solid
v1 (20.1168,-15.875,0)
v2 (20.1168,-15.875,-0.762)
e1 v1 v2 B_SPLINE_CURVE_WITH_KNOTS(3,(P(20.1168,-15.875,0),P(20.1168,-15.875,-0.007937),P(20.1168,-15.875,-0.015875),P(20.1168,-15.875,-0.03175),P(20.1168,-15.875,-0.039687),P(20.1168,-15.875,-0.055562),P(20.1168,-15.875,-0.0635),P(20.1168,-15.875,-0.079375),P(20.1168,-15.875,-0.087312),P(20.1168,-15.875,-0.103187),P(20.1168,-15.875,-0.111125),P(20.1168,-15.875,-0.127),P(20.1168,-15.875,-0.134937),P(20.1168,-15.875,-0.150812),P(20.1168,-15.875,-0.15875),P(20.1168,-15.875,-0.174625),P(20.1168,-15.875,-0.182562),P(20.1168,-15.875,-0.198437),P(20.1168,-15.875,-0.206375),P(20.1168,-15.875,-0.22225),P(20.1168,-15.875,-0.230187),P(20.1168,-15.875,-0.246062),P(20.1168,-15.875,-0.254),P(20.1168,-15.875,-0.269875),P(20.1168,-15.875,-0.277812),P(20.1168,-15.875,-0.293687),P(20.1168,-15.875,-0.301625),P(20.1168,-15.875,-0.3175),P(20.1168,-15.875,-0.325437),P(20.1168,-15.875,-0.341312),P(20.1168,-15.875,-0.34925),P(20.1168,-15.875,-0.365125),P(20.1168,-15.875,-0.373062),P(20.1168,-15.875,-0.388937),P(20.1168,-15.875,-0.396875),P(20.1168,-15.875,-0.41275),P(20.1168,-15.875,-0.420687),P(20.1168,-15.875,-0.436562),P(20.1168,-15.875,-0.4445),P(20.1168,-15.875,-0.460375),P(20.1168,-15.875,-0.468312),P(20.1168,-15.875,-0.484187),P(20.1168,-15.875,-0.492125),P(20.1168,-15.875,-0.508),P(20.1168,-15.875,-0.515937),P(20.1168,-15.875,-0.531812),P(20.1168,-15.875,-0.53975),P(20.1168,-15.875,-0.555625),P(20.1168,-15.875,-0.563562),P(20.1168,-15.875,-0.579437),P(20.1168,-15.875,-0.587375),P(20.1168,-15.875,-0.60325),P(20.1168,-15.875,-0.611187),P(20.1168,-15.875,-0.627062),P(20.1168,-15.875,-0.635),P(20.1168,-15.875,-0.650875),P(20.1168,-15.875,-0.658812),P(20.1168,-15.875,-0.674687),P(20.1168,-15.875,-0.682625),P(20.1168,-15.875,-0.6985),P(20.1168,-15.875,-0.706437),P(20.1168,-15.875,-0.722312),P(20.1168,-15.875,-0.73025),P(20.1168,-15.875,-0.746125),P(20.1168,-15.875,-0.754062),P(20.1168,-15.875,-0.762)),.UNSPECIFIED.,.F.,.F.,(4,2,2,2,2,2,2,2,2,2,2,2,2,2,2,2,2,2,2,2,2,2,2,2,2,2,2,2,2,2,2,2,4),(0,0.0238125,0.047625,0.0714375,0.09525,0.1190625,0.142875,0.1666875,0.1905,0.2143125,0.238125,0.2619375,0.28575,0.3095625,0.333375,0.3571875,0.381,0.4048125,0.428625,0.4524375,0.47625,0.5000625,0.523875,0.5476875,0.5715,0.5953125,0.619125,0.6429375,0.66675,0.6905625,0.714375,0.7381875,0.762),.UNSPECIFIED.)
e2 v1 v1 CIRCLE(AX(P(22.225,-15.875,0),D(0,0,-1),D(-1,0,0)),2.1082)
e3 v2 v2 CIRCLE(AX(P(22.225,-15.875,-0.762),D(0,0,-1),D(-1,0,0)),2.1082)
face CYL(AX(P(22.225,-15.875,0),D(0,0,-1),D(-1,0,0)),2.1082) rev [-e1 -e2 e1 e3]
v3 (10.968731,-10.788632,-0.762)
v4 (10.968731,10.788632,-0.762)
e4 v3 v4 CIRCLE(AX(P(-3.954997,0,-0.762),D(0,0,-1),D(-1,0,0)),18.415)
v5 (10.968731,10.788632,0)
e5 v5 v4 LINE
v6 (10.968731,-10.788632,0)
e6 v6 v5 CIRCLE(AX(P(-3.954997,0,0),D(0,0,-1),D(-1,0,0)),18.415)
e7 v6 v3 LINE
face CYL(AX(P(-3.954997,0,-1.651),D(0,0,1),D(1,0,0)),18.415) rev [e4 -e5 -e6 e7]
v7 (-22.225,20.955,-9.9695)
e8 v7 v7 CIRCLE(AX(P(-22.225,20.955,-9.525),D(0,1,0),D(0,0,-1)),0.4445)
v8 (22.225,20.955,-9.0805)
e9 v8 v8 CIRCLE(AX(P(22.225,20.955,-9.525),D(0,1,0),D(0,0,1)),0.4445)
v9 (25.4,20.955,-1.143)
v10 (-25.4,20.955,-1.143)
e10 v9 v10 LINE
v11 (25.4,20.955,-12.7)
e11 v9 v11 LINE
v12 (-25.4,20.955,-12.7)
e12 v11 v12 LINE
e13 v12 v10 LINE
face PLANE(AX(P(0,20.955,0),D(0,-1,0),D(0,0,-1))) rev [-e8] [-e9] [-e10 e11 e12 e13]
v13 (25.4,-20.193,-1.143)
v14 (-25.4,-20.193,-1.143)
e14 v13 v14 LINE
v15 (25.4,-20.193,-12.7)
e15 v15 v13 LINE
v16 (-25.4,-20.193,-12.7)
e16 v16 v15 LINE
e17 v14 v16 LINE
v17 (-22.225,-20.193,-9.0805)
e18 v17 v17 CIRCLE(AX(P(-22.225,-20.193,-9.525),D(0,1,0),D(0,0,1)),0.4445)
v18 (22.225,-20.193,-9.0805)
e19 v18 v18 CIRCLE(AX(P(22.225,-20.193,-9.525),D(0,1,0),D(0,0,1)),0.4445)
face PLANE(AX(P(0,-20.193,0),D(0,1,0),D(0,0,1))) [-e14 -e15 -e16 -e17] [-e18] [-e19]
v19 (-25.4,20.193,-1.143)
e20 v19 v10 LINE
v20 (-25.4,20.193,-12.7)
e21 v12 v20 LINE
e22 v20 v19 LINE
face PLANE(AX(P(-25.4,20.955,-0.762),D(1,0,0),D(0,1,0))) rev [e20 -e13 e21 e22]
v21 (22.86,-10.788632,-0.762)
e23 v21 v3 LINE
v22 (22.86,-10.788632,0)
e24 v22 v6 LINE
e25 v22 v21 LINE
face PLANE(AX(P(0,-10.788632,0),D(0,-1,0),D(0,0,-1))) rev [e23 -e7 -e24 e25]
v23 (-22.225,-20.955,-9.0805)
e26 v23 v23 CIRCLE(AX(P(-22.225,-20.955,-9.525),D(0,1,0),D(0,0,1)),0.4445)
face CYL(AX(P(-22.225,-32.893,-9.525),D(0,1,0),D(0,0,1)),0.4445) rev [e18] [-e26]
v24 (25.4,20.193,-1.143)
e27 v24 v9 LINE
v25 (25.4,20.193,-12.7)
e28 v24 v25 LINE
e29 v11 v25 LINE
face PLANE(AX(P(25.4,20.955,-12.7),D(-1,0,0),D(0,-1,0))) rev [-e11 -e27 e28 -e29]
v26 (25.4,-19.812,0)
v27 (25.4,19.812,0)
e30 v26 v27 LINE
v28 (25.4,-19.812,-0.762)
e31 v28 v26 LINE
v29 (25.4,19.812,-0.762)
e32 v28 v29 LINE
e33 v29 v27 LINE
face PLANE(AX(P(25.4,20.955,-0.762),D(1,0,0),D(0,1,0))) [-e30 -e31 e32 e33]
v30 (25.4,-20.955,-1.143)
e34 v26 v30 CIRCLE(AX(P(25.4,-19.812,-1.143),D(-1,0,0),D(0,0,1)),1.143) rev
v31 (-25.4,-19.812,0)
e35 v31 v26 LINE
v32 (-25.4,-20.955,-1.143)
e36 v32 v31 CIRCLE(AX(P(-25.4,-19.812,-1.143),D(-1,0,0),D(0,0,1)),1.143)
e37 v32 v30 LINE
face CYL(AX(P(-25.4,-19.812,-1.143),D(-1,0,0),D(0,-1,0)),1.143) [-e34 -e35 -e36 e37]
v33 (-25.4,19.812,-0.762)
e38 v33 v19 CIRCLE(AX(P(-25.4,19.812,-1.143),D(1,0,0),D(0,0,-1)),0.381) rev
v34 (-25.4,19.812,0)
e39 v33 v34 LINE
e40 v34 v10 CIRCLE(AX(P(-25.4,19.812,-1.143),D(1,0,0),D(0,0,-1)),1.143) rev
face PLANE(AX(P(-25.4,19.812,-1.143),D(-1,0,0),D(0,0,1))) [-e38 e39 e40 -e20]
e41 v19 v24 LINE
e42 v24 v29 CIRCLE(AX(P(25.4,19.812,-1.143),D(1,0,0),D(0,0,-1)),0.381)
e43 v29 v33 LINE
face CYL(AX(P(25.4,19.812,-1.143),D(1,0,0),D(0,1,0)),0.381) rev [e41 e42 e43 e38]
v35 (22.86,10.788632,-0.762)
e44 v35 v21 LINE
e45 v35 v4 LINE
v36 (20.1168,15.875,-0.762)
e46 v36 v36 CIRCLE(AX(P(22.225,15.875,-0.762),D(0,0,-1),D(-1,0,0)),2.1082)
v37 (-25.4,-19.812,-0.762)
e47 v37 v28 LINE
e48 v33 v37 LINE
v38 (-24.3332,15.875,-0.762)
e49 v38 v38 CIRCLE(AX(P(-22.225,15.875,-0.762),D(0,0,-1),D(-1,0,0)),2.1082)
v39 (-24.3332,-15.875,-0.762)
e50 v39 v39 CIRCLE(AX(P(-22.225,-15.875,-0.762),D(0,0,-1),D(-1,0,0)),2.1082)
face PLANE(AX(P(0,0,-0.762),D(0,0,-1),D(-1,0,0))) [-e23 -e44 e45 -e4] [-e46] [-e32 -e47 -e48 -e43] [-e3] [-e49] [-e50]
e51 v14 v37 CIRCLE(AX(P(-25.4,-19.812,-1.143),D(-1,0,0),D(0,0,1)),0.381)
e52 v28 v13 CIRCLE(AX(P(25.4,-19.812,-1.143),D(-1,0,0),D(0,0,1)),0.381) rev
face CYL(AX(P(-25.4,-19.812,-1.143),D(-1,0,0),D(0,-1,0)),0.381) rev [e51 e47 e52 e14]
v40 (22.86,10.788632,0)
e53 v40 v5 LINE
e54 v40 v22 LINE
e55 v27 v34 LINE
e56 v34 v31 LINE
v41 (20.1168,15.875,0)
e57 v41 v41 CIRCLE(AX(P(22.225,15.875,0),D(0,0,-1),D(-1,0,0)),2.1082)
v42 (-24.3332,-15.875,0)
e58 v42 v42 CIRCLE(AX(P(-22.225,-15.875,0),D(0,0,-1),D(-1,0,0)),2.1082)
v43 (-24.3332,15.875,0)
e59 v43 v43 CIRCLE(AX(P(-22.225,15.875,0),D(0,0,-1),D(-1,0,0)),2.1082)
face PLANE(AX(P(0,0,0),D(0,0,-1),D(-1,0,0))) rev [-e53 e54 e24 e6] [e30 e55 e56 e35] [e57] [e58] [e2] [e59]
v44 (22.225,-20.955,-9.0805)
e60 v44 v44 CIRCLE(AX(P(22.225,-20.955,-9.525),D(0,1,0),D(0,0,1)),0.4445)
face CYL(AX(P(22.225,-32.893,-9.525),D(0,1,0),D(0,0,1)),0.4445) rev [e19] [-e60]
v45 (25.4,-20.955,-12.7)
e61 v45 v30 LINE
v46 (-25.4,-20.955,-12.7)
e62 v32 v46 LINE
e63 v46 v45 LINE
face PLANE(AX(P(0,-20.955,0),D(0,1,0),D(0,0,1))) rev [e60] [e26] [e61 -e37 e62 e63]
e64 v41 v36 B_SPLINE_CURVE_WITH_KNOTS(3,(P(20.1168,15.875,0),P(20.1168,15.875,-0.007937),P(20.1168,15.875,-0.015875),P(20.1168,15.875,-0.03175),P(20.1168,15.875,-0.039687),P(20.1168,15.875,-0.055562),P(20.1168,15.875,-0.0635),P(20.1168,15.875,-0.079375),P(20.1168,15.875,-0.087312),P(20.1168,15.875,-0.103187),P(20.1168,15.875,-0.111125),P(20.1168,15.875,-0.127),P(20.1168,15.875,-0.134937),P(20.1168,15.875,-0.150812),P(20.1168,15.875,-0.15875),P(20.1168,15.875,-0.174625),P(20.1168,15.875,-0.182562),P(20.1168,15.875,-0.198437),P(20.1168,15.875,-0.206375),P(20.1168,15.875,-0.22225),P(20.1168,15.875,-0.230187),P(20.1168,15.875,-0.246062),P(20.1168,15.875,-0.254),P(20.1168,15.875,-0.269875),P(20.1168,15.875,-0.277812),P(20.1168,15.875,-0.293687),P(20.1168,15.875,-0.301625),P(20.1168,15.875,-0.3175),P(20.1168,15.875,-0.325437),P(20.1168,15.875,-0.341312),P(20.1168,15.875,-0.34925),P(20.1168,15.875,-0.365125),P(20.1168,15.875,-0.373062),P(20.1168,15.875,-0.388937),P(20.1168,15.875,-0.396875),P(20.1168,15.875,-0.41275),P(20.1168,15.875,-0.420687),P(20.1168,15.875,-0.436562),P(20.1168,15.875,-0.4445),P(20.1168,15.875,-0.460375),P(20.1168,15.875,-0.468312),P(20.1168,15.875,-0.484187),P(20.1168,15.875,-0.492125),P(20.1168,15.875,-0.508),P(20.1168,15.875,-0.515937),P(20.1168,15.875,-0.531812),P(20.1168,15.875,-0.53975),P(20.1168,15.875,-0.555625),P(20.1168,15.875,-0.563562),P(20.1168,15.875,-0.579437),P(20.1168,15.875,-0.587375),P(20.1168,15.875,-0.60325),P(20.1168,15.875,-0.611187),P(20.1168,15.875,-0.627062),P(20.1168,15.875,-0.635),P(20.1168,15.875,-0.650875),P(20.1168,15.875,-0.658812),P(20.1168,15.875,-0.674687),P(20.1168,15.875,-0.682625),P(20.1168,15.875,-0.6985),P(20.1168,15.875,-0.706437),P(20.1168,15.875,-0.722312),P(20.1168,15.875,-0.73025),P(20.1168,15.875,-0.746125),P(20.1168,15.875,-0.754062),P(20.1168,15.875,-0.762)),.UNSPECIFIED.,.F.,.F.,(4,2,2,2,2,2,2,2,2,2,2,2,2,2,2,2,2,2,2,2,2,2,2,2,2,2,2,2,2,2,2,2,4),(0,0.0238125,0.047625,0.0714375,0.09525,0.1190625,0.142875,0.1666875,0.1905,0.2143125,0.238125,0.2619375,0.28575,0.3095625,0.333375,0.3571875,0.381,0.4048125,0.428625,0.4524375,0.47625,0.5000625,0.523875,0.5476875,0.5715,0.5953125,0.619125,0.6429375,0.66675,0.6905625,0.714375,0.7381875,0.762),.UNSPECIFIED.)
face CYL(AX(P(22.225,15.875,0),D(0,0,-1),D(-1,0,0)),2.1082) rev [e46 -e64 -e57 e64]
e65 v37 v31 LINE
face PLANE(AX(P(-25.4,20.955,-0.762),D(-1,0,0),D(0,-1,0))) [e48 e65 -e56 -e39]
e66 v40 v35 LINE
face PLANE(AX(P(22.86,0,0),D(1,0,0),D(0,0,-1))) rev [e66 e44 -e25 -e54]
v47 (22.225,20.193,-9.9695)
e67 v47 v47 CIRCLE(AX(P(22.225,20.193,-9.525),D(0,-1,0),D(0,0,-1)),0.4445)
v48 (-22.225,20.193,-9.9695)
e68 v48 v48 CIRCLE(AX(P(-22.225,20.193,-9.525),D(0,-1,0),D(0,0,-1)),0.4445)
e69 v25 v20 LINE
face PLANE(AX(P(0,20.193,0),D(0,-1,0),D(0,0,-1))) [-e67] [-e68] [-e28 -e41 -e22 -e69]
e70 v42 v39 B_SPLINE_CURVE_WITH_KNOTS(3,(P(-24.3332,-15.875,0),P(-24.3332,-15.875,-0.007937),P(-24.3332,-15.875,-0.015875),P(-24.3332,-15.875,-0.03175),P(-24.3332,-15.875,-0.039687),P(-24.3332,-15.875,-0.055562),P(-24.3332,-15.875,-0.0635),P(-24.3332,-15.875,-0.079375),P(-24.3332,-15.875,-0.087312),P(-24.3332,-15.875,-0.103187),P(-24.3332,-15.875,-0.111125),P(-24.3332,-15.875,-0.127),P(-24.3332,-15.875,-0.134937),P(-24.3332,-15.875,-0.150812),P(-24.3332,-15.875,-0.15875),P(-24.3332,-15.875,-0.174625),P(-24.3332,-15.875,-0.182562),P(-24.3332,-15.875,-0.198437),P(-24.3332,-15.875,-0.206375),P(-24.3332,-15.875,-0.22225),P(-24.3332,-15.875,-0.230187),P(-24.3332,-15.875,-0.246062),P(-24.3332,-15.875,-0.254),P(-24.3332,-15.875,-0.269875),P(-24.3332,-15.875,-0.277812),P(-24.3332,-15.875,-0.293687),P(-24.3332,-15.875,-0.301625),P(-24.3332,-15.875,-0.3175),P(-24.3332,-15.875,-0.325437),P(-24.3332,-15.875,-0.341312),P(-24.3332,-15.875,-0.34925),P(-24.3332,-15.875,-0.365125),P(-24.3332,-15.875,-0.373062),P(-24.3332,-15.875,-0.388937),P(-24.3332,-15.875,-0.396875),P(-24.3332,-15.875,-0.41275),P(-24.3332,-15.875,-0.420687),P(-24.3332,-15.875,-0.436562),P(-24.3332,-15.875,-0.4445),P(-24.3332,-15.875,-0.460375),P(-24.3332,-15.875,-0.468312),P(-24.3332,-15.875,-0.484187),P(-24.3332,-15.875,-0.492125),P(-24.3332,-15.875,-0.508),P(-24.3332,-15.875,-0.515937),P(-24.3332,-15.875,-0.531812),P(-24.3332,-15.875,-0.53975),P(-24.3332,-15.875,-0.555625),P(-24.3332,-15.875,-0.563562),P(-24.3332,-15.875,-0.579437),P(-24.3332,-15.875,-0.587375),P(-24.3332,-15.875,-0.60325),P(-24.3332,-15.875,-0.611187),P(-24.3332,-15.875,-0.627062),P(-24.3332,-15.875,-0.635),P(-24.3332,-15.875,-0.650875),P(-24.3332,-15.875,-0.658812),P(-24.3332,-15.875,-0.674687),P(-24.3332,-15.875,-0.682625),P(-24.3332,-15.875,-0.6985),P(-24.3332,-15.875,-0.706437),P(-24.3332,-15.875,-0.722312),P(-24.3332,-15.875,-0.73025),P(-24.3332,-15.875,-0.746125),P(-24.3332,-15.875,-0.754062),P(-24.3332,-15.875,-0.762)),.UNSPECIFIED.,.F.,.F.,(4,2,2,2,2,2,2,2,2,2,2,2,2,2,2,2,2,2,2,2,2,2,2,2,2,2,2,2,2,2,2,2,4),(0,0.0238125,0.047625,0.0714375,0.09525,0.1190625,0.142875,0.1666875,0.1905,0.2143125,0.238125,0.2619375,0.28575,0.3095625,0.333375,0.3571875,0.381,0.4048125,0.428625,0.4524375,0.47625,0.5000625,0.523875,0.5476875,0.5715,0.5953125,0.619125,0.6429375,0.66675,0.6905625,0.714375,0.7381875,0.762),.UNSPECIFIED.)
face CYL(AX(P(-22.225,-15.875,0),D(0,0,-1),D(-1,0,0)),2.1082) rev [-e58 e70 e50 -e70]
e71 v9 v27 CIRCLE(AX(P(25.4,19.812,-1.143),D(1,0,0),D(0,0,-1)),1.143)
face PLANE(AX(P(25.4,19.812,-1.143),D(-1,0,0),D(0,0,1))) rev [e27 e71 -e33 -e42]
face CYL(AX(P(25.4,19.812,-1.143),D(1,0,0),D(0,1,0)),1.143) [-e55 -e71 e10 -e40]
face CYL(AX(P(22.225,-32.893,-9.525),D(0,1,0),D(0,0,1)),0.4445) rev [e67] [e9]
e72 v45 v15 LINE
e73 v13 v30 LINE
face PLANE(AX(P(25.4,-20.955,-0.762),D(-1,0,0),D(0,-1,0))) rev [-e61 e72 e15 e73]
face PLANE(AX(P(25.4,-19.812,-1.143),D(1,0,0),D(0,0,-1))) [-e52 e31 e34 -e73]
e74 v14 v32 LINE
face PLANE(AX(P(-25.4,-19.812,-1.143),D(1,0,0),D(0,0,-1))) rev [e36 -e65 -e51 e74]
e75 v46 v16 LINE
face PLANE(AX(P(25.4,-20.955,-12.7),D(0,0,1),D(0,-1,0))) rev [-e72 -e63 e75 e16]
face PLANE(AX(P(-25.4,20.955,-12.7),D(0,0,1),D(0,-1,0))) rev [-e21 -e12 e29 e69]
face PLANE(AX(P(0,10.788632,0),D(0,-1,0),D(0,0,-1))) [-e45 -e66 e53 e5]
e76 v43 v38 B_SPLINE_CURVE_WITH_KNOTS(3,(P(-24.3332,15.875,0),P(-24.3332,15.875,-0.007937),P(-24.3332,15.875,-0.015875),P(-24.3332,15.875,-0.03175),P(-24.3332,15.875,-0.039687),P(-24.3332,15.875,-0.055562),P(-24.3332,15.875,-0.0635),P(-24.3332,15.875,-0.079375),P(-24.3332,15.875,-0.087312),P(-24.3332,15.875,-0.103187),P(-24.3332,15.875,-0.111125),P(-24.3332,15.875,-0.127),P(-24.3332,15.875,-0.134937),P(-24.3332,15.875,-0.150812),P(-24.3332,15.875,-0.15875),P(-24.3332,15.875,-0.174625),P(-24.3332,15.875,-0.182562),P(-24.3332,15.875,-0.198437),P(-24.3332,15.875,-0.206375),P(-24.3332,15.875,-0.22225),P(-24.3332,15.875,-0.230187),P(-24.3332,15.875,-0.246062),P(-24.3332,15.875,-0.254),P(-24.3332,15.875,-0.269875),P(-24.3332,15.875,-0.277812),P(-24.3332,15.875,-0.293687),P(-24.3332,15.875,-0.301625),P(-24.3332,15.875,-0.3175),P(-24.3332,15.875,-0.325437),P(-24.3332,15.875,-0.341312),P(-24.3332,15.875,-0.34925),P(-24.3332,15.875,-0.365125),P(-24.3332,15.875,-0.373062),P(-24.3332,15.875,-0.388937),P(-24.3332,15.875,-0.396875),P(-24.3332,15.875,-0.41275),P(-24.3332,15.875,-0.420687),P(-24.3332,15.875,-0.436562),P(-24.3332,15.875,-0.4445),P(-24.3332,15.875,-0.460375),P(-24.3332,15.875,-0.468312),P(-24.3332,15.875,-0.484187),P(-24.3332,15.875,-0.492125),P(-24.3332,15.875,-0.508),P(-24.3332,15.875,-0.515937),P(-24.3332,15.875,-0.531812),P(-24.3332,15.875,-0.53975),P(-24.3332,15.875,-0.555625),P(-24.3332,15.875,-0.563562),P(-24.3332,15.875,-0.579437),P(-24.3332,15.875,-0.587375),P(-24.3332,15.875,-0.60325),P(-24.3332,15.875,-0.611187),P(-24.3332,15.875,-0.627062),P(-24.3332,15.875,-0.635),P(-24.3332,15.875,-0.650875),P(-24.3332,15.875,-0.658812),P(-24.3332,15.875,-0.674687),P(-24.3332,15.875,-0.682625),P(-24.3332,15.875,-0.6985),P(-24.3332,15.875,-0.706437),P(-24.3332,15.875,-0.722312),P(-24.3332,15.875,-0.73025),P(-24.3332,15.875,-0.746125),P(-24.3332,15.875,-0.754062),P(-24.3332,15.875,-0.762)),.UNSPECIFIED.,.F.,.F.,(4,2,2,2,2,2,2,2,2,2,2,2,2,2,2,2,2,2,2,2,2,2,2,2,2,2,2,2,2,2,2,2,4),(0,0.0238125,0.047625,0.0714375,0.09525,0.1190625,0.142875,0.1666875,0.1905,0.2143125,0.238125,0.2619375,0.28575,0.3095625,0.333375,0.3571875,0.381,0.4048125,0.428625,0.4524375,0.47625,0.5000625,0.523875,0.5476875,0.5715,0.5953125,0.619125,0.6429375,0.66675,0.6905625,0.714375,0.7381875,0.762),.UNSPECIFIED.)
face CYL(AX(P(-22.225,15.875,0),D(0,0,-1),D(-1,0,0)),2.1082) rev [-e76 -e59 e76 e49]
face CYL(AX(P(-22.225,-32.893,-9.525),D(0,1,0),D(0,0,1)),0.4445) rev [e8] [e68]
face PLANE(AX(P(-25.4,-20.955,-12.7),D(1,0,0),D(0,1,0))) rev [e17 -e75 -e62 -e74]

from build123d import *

# Parameters (mm, degrees)
SKETCH1_W                      = 50.8
SKETCH1_H                      = 41.91
BASE_FLANGE1_DEPTH             = 0.762
EDGE_FLANGE1_STRIP_W           = 3.81
EDGE_FLANGE1_STRIP_H           = 0.762
EDGE_FLANGE1_STRIP_CUT_DEPTH   = 50.8
EDGE_FLANGE1_STRIP_2_W         = 3.81
EDGE_FLANGE1_STRIP_2_H         = 0.762
EDGE_FLANGE1_STRIP_CUT_2_DEPTH = 50.8
EDGE_FLANGE1_DEPTH             = 50.8
EDGE_FLANGE1_BEND_DEPTH        = 50.8
SKETCH14_R                     = 18.415
CUT_EXTRUDE1_DEPTH             = 2.54
SKETCH16_R                     = 0.4445
CUT_EXTRUDE4_DEPTH             = 53.848
SKETCH17_R                     = 2.1082
CUT_EXTRUDE5_DEPTH             = 36.025531673
CUT_EXTRUDE6_DEPTH             = 36.025531673


# Sheet-metal steps are written as plain solids
with BuildPart() as part:
    # Sketch1 → Base-Flange1 (new body)
    with BuildSketch(Plane.XY):
        Rectangle(SKETCH1_W, SKETCH1_H)
    extrude(amount=-BASE_FLANGE1_DEPTH)

    # Edge-Flange1 strip (across the edge) → Edge-Flange1 strip cut (cut)
    with BuildSketch(Plane(origin=(-25.4, 20.955, -0.762), x_dir=(0, -1, 0), z_dir=(1, 0, 0))):
        with Locations((-0.762, -0.381)):
            Rectangle(EDGE_FLANGE1_STRIP_W, EDGE_FLANGE1_STRIP_H)
    extrude(amount=EDGE_FLANGE1_STRIP_CUT_DEPTH, mode=Mode.SUBTRACT)

    # Edge-Flange1 strip 2 (across the edge) → Edge-Flange1 strip cut 2 (cut)
    with BuildSketch(Plane(origin=(25.4, -20.955, -0.762), x_dir=(0, 1, 0), z_dir=(-1, 0, 0))):
        with Locations((-0.762, -0.381)):
            Rectangle(EDGE_FLANGE1_STRIP_2_W, EDGE_FLANGE1_STRIP_2_H)
    extrude(amount=EDGE_FLANGE1_STRIP_CUT_2_DEPTH, mode=Mode.SUBTRACT)

    # Edge-Flange1 section (across the edge) → Edge-Flange1 (add)
    with BuildSketch(Plane(origin=(-25.4, 20.955, -0.762), x_dir=(0, -1, 0), z_dir=(1, 0, 0))):
        with BuildLine():
            Line((0, 0.381), (0, 11.938))
            Line((0, 11.938), (0.762, 11.938))
            Line((0.762, 11.938), (0.762, 0.381))
            ThreePointArc((0.762, 0.381), (0.873592316, 0.111592316), (1.143, 0))
            Line((1.143, 0), (1.143, -0.762))
            ThreePointArc((1.143, -0.762), (0.334776949, -0.427223051), (0, 0.381))
        make_face()
    extrude(amount=EDGE_FLANGE1_DEPTH)

    # Edge-Flange1 section 2 (across the edge) → Edge-Flange1 bend (add)
    with BuildSketch(Plane(origin=(25.4, -20.955, -0.762), x_dir=(0, 1, 0), z_dir=(-1, 0, 0))):
        with BuildLine():
            Line((0, 0.381), (0, 11.938))
            Line((0, 11.938), (0.762, 11.938))
            Line((0.762, 11.938), (0.762, 0.381))
            ThreePointArc((0.762, 0.381), (0.873592316, 0.111592316), (1.143, 0))
            Line((1.143, 0), (1.143, -0.762))
            ThreePointArc((1.143, -0.762), (0.334776949, -0.427223051), (0, 0.381))
        make_face()
    extrude(amount=EDGE_FLANGE1_BEND_DEPTH)

    # Sketch14 → Cut-Extrude1 (cut)
    with BuildSketch(Plane.XY.offset(0.889)):
        with Locations(Location((-3.954996568, 0, 0), (0, 0, 180))):
            Circle(SKETCH14_R)
    extrude(amount=-CUT_EXTRUDE1_DEPTH, mode=Mode.SUBTRACT)

    # Sketch16 → Cut-Extrude4 (cut)
    with BuildSketch(Plane(origin=(0, 20.955, 0), x_dir=(1, 0, 0), z_dir=(0, 1, 0))):
        with Locations(Location((22.225, 9.525, 0), (0, 0, 270))):
            Circle(SKETCH16_R)
        with Locations(Location((-22.225, 9.525, 0), (0, 0, 270))):
            Circle(SKETCH16_R)
    extrude(amount=-CUT_EXTRUDE4_DEPTH, mode=Mode.SUBTRACT)

    # Sketch17 → Cut-Extrude5 (cut, through all)
    with BuildSketch(Plane(origin=(0, 0, -0.762), x_dir=(-1, 0, 0), z_dir=(0, 0, -1))):
        with Locations((-22.225, 15.875)):
            Circle(SKETCH17_R)
        with Locations((-22.225, -15.875)):
            Circle(SKETCH17_R)
        with Locations((22.225, -15.875)):
            Circle(SKETCH17_R)
        with Locations((22.225, 15.875)):
            Circle(SKETCH17_R)
    extrude(amount=-CUT_EXTRUDE5_DEPTH, mode=Mode.SUBTRACT)

    # Sketch18 → Cut-Extrude6 (cut, through all)
    with BuildSketch(Plane(origin=(0, 0, -0.762), x_dir=(-1, 0, 0), z_dir=(0, 0, -1))):
        with BuildLine():
            Line((-10.968730797, 10.788632283), (-22.86, 10.788632283))
            Line((-22.86, 10.788632283), (-22.86, -10.788632283))
            Line((-22.86, -10.788632283), (-10.968730797, -10.788632283))
            ThreePointArc((-10.968730797, -10.788632283), (-14.460003432, 0), (-10.968730797, 10.788632283))
        make_face()
    extrude(amount=-CUT_EXTRUDE6_DEPTH, mode=Mode.SUBTRACT)


solid = part.part
